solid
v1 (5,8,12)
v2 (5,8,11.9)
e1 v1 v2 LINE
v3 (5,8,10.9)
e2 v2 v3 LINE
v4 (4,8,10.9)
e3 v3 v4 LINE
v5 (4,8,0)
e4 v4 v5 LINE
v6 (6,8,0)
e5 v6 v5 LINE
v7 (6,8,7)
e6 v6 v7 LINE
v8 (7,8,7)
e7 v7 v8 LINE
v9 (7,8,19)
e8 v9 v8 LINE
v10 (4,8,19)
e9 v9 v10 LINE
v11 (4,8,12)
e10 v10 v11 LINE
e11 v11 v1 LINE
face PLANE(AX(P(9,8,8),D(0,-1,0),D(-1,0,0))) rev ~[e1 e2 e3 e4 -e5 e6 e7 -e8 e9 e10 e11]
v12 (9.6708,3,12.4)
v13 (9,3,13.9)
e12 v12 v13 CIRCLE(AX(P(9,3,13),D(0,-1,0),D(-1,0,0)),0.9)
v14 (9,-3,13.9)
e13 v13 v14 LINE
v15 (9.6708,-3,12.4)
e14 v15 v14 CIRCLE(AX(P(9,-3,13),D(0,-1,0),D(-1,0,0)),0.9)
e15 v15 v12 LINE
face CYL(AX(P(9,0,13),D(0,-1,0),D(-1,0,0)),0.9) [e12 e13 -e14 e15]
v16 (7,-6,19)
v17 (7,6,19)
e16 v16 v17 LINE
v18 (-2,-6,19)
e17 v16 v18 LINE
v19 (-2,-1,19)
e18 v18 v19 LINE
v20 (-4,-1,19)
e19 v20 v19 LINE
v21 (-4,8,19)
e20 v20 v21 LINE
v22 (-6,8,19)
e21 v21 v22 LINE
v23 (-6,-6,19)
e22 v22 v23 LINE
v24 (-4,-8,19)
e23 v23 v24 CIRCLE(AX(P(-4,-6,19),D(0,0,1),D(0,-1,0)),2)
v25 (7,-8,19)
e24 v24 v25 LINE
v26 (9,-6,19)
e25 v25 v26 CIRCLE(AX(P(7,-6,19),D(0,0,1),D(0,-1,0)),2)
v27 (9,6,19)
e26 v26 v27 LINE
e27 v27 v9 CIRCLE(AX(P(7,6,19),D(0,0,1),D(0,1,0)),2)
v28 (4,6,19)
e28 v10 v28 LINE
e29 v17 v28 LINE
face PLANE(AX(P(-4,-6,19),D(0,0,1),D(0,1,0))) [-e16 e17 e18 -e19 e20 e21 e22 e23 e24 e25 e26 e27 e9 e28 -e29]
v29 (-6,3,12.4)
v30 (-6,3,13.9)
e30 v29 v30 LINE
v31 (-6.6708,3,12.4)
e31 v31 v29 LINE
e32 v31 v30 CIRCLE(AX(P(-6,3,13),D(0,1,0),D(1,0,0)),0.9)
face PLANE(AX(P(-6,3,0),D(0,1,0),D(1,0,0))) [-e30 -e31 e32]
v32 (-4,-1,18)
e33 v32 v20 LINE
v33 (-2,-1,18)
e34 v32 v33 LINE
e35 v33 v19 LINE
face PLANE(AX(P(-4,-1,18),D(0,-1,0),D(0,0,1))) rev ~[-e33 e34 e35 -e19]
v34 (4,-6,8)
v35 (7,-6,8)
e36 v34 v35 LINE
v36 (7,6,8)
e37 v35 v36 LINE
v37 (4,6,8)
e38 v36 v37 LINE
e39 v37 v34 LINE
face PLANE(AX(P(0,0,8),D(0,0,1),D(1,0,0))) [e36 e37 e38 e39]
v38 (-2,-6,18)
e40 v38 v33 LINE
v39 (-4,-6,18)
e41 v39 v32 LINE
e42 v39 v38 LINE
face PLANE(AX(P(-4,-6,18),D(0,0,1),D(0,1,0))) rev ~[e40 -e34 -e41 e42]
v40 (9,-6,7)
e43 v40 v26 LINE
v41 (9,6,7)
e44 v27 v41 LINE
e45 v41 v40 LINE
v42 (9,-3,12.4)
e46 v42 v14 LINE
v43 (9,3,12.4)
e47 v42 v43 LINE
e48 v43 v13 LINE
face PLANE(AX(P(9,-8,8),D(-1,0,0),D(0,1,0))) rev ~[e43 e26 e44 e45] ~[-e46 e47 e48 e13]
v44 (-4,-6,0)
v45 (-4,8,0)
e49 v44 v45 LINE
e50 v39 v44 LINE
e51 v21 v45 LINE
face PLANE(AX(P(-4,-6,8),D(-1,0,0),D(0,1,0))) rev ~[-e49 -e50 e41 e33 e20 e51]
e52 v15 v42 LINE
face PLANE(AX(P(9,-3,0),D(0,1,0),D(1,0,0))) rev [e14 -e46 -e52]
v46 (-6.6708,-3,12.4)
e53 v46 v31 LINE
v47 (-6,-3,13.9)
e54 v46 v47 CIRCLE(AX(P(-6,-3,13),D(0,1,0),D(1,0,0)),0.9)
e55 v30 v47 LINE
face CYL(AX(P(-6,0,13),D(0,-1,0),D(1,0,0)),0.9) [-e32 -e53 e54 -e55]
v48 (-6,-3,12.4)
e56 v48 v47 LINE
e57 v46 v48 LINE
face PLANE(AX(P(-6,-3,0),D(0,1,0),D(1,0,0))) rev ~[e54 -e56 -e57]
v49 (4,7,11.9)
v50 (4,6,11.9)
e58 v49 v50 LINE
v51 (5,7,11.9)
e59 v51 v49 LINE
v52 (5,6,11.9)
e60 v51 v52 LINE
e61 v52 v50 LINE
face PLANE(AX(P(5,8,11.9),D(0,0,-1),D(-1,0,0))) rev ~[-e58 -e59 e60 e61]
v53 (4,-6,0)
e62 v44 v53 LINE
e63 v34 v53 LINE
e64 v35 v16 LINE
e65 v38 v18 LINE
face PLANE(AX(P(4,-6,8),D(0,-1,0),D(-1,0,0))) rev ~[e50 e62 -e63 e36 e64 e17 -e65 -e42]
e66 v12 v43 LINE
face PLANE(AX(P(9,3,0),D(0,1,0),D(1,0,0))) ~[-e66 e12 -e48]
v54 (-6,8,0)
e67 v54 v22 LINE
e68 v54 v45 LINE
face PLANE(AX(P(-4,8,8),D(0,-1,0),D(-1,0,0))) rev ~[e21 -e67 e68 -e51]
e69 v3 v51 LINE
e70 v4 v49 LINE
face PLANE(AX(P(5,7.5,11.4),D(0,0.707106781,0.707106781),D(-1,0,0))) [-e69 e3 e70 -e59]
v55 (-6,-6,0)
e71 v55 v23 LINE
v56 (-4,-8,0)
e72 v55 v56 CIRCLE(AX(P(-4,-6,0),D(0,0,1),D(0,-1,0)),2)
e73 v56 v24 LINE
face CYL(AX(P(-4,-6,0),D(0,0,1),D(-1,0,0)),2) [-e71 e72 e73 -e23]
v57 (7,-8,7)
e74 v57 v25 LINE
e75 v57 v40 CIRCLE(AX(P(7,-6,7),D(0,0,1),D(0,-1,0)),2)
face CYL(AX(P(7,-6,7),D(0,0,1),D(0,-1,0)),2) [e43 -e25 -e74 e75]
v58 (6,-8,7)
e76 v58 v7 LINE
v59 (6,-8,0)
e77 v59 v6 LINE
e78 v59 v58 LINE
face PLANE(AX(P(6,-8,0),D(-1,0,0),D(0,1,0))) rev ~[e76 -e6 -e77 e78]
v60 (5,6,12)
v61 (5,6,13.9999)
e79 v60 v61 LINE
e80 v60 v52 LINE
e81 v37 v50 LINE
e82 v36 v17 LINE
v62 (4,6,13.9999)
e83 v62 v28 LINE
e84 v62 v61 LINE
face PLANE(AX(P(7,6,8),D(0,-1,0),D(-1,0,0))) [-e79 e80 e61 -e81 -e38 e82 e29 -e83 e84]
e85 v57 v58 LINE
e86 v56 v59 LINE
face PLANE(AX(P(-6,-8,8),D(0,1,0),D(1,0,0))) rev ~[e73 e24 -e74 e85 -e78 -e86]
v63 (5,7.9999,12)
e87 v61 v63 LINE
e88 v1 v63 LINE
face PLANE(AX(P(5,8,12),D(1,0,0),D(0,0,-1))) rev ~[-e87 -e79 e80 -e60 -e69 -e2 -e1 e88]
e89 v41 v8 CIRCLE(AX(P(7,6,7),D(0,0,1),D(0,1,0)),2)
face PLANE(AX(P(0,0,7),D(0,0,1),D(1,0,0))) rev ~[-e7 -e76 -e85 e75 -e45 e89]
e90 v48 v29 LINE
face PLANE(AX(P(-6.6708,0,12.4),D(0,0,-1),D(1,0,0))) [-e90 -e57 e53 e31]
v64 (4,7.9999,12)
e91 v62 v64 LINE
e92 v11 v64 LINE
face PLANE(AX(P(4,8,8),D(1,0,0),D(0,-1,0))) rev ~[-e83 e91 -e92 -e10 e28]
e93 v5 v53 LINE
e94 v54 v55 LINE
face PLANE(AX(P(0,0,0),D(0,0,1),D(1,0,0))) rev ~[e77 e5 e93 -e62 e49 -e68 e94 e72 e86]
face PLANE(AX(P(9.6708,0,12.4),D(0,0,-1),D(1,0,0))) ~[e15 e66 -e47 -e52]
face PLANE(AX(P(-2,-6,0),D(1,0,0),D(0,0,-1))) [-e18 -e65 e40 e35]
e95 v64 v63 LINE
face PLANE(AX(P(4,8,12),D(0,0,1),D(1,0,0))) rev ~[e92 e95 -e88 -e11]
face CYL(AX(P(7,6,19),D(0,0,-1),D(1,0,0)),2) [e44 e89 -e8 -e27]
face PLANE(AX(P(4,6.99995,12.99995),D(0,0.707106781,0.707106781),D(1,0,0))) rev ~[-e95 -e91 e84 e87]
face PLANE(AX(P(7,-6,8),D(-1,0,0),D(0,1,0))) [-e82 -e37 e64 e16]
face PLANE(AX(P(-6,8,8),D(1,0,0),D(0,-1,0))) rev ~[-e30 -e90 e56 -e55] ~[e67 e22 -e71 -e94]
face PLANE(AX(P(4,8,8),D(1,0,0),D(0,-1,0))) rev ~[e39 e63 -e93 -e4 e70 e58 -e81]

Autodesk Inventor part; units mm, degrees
ref_plane "YZ Plane" through (0, 0, 0) normal (1, 0, 0) x (0, 1, 0)
ref_plane "XZ Plane" through (0, 0, 0) normal (0, 1, 0) x (-1, 0, 0)
ref_plane "XY Plane" through (0, 0, 0) normal (0, 0, 1) x (1, 0, 0)
sketch "스케치1" plane through (0, 0, 0) normal (0, 0, 1) x (1, 0, 0)
  line L0 (-4, -6) -> (4, -6)
  line L1 (4, -6) -> (4, 6)
  line L2 (4, 6) -> (-4, 6)
  line L3 (-4, 6) -> (-4, -6)
  line L4 (-4, -6) -> (4, 6) construction
  line L5 (4, -6) -> (-4, 6) construction
  line L6 (-6, 8) -> (-6, -8)
  line L7 (-6, -8) -> (6, -8)
  line L8 (6, -8) -> (6, 8)
  line L9 (6, 8) -> (4, 8)
  line L10 (4, 8) -> (4, 6)
  line L11 (-6, 8) -> (-4, 8)
  line L12 (-4, 8) -> (-4, 6)
  point P0 (0, 0)
  dimension "d0" = 8
  dimension "d1" = 12
  dimension "d2" = 2
  dimension "t" = 2
  dimension "d4" = 2
  dimension "d5" = 2
extrude "돌출1" add sketch "스케치1" along normal blind 7 contours L0 L1 L10 L9 L8 L7 L6 L11 L12 L3
sketch "스케치2" plane through (0, 0, 7) normal (0, 0, 1) x (1, 0, 0)
  line L0 (4, 8) -> (4, -6) projected
  line L1 (4, -6) -> (-4, -6) projected
  line L2 (-4, -6) -> (-4, 8) projected
  line L3 (-4, 8) -> (-6, 8) projected
  line L4 (-6, 8) -> (-6, -8) projected
  line L5 (-6, -8) -> (6, -8) projected
  line L6 (6, 8) -> (4, 8) projected
  line L7 (6, 8) -> (9, 8)
  line L8 (9, 8) -> (9, -8)
  line L9 (9, -8) -> (6, -8)
  point P0 (0, 0)
  dimension "d8" = 3
extrude "돌출2" add sketch "스케치2" along normal blind 1
sketch "스케치3" plane through (0, 0, 8) normal (0, 0, 1) x (1, 0, 0)
  line L0 (-6, 8) -> (-6, -8) projected
  line L1 (-6, -8) -> (9, -8) projected
  line L2 (9, -8) -> (9, 8) projected
  line L3 (9, 8) -> (4, 8) projected
  line L4 (4, 8) -> (4, -6) projected
  line L5 (4, -6) -> (-4, -6) projected
  line L6 (-4, -6) -> (-4, 8) projected
  line L7 (-4, 8) -> (-6, 8) projected
  line L8 (4, -6) -> (-4, -6) projected
  line L9 (4, -6) -> (7, -6)
  line L10 (7, -6) -> (7, 6)
  line L11 (7, 6) -> (4, 6)
  line L12 (4, 8) -> (4, -6) projected
  point P0 (0, 0)
  point P1 (4, 6)
  dimension "d11" = 2
  dimension "d12" = 2
extrude "돌출3" add sketch "스케치3" along normal blind 11 contours L7 L6 L5 L9 L10 L11 L4 L3 L2 L1 L0
sketch "스케치4" plane through (-4, -6, 0) normal (1, 0, 0) x (0, 0, -1)
  line L0 (-19, 0) -> (-19, 14) projected
  line L1 (0, 0) -> (-19, 0) projected
  line L2 (-19, 0) -> (-18, 0)
  line L3 (-18, 0) -> (-18, 5)
  line L4 (-18, 5) -> (-19, 5)
  line L5 (-19, 5) -> (-19, 0)
  point P0 (0, 6)
  dimension "d15" = 1
  dimension "d16" = 5
extrude "돌출4" add sketch "스케치4" along normal blind 2
ref_plane "작업 평면1" through (-6, 0, 0) normal (0, 1, 0) x (1, 0, 0)
sketch "스케치5" plane through (-6, 0, 0) normal (0, 1, 0) x (1, 0, 0)
  line L0 (0, 0) -> (12, 0) projected
  line L1 (12, 0) -> (12, -7) projected
  line L2 (12, -7) -> (15, -7) projected
  line L3 (15, -7) -> (15, -19) projected
  line L4 (0, -19) -> (15, -19) projected
  line L5 (0, 0) -> (0, -19) projected
  line L6 (0, 0) -> (0, -19) projected
  circle A0 centre (0, -13) radius 0.9
  line L7 (-0.6708, -12.4) -> (0, -12.4)
  point P0 (6, 0)
  point P1 (0, -13.9)
  dimension "k" = 1.8
  dimension "d20" = 0.6
  dimension "d21" = 6
extrude "돌출5" add sketch "스케치5" along normal mid plane 6 contours L5 A0 L7 picked at (-0.0684, -13.3921)
ref_plane "작업 평면2" through (1.5, -8, 0) normal (-1, 0, 0) x (0, 0, 1)
mirror "미러1" about plane through (1.5, -8, 0) normal (-1, 0, 0) of "돌출5"
fillet "모깎기1" radius 2 3 edges at (9, 8, 13) (-6, -8, 9.5) (9, -8, 13)
sketch "스케치6" plane through (4, 8, 0) normal (0, 1, 0) x (1, 0, 0)
  line L0 (0, 0) -> (0, -19) projected
  line L1 (0, -12) -> (1, -12)
  line L2 (1, -12) -> (1, -11.9)
  line L3 (1, -11.9) -> (0, -11.9)
  line L4 (0, -11.9) -> (0, -12)
  line L5 (3, -19) -> (0, -19) projected
  point P0 (-4, 0)
  point P1 (0, -11.9)
  dimension "d25" = 1
  dimension "d26" = 0.1
  dimension "d29" = 7
extrude "돌출6" cut sketch "스케치6" against normal up to surface (2 mm away)
chamfer "모따기1" distance 2 angle 45 1 edges at (4.5, 6, 12)
chamfer "모따기2" distance 1 angle 45 1 edges at (4.5, 8, 11.9)
equation "\"d2\" = t"
equation "\"d4\" = t"
equation "\"d20\" = 0.333333 * k"
properties part number "_3D 인쇄"
